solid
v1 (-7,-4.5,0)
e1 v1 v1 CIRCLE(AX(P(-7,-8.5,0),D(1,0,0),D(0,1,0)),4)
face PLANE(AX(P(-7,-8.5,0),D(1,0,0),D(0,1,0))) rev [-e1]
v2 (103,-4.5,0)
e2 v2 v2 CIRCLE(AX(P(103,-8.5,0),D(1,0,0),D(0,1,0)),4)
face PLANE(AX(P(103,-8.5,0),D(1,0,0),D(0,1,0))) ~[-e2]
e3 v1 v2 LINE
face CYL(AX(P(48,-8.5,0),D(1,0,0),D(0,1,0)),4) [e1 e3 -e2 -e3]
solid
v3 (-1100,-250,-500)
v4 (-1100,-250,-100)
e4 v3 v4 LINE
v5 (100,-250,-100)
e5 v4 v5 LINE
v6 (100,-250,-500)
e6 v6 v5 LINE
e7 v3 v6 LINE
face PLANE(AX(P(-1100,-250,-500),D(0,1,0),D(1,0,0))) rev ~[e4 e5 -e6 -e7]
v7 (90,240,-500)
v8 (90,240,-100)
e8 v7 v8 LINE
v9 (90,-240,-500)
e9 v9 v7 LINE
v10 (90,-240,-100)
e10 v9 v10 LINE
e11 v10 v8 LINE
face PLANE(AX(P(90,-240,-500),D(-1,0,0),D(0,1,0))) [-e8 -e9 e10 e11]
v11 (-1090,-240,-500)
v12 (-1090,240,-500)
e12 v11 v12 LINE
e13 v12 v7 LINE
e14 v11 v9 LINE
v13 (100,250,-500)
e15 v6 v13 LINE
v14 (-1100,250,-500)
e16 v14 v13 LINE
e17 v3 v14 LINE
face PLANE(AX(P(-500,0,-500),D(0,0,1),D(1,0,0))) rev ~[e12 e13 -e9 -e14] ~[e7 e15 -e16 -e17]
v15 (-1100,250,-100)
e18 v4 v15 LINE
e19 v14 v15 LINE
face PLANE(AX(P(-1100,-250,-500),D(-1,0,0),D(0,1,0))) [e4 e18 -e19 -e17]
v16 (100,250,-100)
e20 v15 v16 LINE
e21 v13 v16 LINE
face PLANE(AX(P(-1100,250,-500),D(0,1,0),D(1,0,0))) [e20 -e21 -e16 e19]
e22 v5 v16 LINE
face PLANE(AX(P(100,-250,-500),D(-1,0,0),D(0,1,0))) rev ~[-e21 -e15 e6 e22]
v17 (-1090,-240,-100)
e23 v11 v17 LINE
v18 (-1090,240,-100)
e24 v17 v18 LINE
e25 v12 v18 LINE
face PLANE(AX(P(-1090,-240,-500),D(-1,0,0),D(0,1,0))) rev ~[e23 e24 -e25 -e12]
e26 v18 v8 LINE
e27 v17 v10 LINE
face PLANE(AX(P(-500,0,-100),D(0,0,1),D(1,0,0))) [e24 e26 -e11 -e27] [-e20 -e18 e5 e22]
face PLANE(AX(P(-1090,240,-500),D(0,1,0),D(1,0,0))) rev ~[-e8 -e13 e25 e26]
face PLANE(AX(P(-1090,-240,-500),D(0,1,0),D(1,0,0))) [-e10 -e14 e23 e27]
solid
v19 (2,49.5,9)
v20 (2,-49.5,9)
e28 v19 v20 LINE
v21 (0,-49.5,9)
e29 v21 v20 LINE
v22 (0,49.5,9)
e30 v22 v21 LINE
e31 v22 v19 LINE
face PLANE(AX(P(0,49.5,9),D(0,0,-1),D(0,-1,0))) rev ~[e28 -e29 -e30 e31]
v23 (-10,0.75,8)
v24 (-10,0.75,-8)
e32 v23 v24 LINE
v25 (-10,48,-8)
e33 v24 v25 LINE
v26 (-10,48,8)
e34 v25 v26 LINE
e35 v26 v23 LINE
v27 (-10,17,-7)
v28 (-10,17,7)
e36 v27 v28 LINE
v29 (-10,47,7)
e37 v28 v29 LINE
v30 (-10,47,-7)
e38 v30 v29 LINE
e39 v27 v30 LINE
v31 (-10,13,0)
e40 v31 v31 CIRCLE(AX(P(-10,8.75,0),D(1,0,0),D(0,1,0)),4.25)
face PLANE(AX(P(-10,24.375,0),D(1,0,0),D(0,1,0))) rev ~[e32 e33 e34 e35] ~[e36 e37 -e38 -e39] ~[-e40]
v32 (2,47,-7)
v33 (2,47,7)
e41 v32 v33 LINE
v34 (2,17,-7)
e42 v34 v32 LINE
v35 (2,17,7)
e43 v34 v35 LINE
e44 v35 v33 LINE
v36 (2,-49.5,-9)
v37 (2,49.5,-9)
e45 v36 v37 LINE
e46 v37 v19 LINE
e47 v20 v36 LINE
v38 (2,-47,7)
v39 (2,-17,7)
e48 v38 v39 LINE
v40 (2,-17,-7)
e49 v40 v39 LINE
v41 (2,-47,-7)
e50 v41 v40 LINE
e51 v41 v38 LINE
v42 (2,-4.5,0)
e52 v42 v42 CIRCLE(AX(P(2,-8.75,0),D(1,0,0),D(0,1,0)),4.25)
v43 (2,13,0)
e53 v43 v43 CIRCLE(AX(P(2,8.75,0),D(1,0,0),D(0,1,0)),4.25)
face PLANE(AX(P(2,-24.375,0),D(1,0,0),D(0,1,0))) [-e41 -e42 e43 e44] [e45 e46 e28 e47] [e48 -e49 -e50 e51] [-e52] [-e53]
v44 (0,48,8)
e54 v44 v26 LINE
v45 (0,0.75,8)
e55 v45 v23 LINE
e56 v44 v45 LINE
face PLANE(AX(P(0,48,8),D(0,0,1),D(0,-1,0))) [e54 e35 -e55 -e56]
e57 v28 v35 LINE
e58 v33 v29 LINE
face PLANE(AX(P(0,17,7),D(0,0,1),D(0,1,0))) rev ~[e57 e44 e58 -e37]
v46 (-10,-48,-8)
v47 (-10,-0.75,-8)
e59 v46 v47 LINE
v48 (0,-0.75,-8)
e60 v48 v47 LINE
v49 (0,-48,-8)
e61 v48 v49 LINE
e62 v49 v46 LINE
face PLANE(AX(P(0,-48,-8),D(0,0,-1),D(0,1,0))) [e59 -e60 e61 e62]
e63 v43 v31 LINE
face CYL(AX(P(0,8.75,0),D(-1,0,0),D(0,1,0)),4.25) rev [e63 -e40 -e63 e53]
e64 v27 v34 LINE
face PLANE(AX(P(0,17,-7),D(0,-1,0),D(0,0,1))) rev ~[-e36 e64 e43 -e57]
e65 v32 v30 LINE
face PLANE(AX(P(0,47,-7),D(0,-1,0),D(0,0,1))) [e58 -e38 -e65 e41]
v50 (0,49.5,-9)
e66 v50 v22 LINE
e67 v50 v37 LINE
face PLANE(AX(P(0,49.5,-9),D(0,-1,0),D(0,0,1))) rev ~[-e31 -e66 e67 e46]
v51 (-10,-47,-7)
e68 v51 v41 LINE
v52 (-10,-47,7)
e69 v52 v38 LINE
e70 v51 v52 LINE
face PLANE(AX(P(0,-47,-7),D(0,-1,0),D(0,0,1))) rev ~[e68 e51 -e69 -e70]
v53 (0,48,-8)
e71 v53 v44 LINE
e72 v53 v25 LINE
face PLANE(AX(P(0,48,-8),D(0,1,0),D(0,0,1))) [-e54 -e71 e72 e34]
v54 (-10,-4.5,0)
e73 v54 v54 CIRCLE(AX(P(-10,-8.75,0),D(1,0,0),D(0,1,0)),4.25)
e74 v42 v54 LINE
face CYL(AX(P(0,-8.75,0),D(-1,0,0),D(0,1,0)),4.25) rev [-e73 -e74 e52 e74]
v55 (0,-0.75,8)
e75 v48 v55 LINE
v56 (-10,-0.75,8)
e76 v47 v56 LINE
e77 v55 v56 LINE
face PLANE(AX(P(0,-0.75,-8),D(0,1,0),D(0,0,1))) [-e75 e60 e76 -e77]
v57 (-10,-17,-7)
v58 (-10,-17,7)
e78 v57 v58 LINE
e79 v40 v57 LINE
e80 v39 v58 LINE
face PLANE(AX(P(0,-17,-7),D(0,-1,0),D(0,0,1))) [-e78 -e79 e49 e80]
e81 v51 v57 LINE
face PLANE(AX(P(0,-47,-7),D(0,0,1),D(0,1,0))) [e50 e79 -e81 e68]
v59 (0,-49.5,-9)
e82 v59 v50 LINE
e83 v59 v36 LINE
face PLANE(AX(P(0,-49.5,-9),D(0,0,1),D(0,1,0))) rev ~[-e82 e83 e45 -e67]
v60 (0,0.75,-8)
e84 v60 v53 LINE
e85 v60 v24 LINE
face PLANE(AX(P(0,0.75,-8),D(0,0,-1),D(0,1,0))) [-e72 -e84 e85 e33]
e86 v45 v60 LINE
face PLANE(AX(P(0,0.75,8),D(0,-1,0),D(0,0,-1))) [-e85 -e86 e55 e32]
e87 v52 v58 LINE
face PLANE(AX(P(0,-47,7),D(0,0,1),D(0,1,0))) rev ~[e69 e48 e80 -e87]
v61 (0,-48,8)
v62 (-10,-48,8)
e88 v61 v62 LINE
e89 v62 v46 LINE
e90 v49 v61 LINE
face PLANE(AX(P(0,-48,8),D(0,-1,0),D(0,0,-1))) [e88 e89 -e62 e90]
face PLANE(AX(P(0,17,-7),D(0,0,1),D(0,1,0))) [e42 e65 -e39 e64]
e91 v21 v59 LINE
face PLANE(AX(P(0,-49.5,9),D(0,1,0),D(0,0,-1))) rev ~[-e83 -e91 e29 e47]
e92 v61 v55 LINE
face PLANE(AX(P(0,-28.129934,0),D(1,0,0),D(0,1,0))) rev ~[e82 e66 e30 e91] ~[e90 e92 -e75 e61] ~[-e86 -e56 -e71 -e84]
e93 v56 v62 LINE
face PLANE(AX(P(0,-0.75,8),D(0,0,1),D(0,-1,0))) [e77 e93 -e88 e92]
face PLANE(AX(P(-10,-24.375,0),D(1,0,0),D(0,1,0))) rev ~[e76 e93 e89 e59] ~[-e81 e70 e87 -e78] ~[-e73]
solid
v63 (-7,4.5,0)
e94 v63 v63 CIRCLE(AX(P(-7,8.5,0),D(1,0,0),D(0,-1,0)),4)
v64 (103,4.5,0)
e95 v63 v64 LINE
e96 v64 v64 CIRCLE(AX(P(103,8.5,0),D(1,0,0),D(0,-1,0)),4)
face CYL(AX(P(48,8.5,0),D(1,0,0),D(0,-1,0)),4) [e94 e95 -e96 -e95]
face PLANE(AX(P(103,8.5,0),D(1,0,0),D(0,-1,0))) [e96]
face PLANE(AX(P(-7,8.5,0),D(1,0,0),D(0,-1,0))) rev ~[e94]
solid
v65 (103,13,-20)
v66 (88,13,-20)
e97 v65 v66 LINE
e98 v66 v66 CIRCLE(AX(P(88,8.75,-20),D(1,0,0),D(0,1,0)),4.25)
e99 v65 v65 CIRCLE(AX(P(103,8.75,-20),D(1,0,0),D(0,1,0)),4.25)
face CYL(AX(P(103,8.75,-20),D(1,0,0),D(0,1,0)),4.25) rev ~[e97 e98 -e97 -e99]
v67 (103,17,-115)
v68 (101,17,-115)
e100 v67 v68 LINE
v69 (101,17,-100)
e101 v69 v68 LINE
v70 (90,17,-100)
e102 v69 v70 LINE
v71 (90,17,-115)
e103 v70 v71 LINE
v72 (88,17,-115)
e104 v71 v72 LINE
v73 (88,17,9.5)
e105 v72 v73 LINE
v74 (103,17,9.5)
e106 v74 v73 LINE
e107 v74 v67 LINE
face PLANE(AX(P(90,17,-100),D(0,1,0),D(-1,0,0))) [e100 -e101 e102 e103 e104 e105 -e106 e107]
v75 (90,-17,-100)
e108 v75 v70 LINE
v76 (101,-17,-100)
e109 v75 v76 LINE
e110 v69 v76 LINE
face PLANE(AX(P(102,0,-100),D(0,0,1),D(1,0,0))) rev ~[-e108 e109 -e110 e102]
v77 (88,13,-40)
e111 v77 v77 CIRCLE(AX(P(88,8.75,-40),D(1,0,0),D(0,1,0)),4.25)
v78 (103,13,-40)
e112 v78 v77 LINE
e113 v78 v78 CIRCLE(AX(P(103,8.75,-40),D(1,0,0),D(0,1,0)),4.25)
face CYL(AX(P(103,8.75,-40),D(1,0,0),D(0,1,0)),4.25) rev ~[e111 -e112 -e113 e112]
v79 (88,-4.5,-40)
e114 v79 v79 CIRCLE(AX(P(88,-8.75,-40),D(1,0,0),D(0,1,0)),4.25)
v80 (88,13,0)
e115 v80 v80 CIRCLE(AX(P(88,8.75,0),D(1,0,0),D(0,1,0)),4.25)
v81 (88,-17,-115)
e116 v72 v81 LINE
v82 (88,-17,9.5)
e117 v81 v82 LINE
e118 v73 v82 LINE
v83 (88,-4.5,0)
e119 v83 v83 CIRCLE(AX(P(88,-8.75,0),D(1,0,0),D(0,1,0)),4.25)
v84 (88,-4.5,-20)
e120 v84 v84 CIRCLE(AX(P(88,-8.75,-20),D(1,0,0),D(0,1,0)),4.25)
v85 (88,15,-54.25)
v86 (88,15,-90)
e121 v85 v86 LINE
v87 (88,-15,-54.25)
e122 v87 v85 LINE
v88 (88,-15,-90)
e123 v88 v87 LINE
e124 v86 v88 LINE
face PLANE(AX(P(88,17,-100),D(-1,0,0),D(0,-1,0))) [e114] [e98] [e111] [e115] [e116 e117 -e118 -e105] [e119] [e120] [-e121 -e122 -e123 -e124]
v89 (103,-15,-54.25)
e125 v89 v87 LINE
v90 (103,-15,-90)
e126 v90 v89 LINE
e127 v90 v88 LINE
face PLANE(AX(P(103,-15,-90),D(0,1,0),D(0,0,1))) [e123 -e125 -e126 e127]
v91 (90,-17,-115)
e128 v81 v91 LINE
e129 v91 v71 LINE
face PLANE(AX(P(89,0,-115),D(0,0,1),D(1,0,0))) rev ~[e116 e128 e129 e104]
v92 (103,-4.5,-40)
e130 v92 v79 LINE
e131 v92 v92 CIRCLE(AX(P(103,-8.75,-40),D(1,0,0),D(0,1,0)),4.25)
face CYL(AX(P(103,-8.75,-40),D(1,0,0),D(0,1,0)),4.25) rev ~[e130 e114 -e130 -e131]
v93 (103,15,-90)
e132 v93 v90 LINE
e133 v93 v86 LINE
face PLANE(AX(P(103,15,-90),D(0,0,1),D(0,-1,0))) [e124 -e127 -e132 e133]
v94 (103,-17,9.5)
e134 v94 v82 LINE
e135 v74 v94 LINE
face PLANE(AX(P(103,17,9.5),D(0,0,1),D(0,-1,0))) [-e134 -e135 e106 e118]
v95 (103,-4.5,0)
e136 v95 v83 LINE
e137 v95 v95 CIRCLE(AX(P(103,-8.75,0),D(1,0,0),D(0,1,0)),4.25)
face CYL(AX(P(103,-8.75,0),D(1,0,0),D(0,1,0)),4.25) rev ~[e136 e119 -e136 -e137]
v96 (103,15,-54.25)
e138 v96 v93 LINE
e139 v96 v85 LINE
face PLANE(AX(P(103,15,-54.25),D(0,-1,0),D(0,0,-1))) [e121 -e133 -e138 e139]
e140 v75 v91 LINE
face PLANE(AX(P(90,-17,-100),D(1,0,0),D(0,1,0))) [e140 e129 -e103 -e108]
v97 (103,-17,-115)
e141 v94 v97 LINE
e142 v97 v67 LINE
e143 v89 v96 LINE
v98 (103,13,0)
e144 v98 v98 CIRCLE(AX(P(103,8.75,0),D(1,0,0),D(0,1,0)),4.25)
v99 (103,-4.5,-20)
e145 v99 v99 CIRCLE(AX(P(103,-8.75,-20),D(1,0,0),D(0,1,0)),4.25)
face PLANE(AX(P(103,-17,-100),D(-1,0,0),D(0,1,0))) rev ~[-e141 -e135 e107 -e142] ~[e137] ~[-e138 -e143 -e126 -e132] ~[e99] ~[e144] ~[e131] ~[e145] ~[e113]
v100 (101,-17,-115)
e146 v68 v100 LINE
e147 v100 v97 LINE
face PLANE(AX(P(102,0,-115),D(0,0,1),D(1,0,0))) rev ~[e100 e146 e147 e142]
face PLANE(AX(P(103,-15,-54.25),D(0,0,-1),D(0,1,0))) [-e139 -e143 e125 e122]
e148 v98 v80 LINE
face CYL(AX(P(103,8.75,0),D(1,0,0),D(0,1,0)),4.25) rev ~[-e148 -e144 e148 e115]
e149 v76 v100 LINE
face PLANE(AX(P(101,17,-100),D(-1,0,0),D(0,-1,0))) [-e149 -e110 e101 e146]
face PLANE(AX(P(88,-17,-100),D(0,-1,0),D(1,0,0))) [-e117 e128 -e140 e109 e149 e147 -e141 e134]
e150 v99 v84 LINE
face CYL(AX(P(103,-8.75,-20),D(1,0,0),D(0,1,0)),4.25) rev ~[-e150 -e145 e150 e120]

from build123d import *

# Parameters (mm, degrees)
F0_W          = 1.5
F0_H          = 1
F0_H_2        = 16
F0_R          = 4.25
F0_W_2        = 30
F0_H_3        = 14
F1_DEPTH      = 2
F2_DEPTH      = 10
F2_DEPTH_BACK = 2
F5_W          = 1200
F5_H          = 500
F5_W_2        = 1180
F5_H_2        = 480
F6_DEPTH      = 400
F7_W          = 10
F7_H          = 2
F7_W_2        = 1
F7_H_2        = 30
F8_DEPTH      = 10
F9_DEPTH      = 15
F10_R         = 4.25
F11_DEPTH     = 15
F12_W         = 110
F12_H         = 4


# Not quite as in the source:
# - a feature names something its author has since deleted; it is built from what else it names
# - the program builds the solid bodies; features that only make, move or delete a surface that nothing else refers to are left out


with BuildPart() as f1:
    # F0 (on Right) → F1 (new body)
    with BuildSketch(Plane.YZ):
        Polygon((-0.75, 9), (-49.5, 9), (-49.5, -9), (-0.75, -9), (-0.75, -8), (-13, -8), (-16, -8), (-48, -8), (-48, 8), (-16, 8), (-13, 8), (-0.75, 8), align=None)
        with Locations((0, 8.5)):
            Rectangle(F0_W, F0_H)
        Polygon((49.5, 9), (0.75, 9), (0.75, 8), (13, 8), (16, 8), (48, 8), (48, -8), (16, -8), (13, -8), (0.75, -8), (0.75, -9), (49.5, -9), align=None)
        with Locations((0, -8.5)):
            Rectangle(F0_W, F0_H)
        Rectangle(F0_W, F0_H_2)
        Polygon((13, 8), (0.75, 8), (0.75, -8), (13, -8), (16, -8), (48, -8), (48, 8), (16, 8), align=None)
        with Locations((8.75, 0)):
            Circle(F0_R, mode=Mode.SUBTRACT)
        with Locations((32, 0)):
            Rectangle(F0_W_2, F0_H_3, mode=Mode.SUBTRACT)
    extrude(amount=F1_DEPTH)

    # F0 (on Right) → F2 (join, two sides)
    with BuildSketch(Plane.YZ) as f2_sk:
        Polygon((-0.75, -8), (-0.75, 8), (-13, 8), (-16, 8), (-48, 8), (-48, -8), (-16, -8), (-13, -8), align=None)
        with Locations((-32, 0)):
            Rectangle(F0_W_2, F0_H_3, mode=Mode.SUBTRACT)
        with Locations((-8.75, 0)):
            Circle(F0_R, mode=Mode.SUBTRACT)
        Polygon((13, 8), (0.75, 8), (0.75, -8), (13, -8), (16, -8), (48, -8), (48, 8), (16, 8), align=None)
        with Locations((8.75, 0)):
            Circle(F0_R, mode=Mode.SUBTRACT)
        with Locations((32, 0)):
            Rectangle(F0_W_2, F0_H_3, mode=Mode.SUBTRACT)
    extrude(amount=-F2_DEPTH)
    extrude(f2_sk.sketch, amount=F2_DEPTH_BACK)


with BuildPart() as f6:
    # F5 (on offset) → F6 (new body)
    with BuildSketch(Plane.XY.offset(-500)):
        with Locations((-500, 0)):
            Rectangle(F5_W, F5_H)
        with Locations((-500, 0)):
            Rectangle(F5_W_2, F5_H_2, mode=Mode.SUBTRACT)
    extrude(amount=F6_DEPTH)


with BuildPart() as f8:
    # F7 (on face) → F8 (new body)
    with BuildSketch(Plane.XY.offset(-100)):
        Polygon((101, 17), (101, 15), (101, -15), (101, -17), (103, -17), (103, 17), align=None)
        Polygon((90, -15), (90, 15), (90, 17), (88, 17), (88, -17), (90, -17), align=None)
        with Locations((95, 16)):
            Rectangle(F7_W, F7_H)
        with Locations((100.5, 16)):
            Rectangle(F7_W_2, F7_H)
        with Locations((100.5, -16)):
            Rectangle(F7_W_2, F7_H)
        with Locations((95, -16)):
            Rectangle(F7_W, F7_H)
        with Locations((100.5, 0)):
            Rectangle(F7_W_2, F7_H_2)
        with Locations((95, 0)):
            Rectangle(F7_W, F7_H_2)
    extrude(amount=F8_DEPTH)

    # F7 (on face) → F9 (join)
    with BuildSketch(Plane.XY.offset(-100)):
        Polygon((90, -15), (90, 15), (90, 17), (88, 17), (88, -17), (90, -17), align=None)
        Polygon((101, 17), (101, 15), (101, -15), (101, -17), (103, -17), (103, 17), align=None)
    extrude(amount=-F9_DEPTH)

    # F10 (on face) → F11 (join)
    with BuildSketch(Plane.YZ.offset(103)):
        Polygon((-15, -90), (-17, -90), (-17, -100), (17, -100), (17, -90), (15, -90), align=None)
        Polygon((-17, 9.5), (-17, -90), (-15, -90), (-15, -54.25), (15, -54.25), (15, -90), (17, -90), (17, 9.5), align=None)
        with Locations((-8.75, -40)):
            Circle(F10_R, mode=Mode.SUBTRACT)
        with Locations((-8.75, -20)):
            Circle(F10_R, mode=Mode.SUBTRACT)
        with Locations((-8.75, 0)):
            Circle(F10_R, mode=Mode.SUBTRACT)
        with Locations((8.75, -40)):
            Circle(F10_R, mode=Mode.SUBTRACT)
        with Locations((8.75, -20)):
            Circle(F10_R, mode=Mode.SUBTRACT)
        with Locations((8.75, 0)):
            Circle(F10_R, mode=Mode.SUBTRACT)
    extrude(amount=-F11_DEPTH)


with BuildPart() as f13:
    # F12 (on Top) → F13 (revolve)
    with BuildSketch(Plane.XY):
        with Locations((48, -6.5)):
            Rectangle(F12_W, F12_H)
    revolve(axis=Axis((48, -8.5, 0), (1, 0, 0)))


with BuildPart() as f14:
    # F12 (on Top) → F14 (revolve)
    with BuildSketch(Plane.XY):
        with Locations((48, 6.5)):
            Rectangle(F12_W, F12_H)
    revolve(axis=Axis((48, 8.5, 0), (1, 0, 0)))


solid = Compound([f1.part, f6.part, f8.part, f13.part, f14.part])
